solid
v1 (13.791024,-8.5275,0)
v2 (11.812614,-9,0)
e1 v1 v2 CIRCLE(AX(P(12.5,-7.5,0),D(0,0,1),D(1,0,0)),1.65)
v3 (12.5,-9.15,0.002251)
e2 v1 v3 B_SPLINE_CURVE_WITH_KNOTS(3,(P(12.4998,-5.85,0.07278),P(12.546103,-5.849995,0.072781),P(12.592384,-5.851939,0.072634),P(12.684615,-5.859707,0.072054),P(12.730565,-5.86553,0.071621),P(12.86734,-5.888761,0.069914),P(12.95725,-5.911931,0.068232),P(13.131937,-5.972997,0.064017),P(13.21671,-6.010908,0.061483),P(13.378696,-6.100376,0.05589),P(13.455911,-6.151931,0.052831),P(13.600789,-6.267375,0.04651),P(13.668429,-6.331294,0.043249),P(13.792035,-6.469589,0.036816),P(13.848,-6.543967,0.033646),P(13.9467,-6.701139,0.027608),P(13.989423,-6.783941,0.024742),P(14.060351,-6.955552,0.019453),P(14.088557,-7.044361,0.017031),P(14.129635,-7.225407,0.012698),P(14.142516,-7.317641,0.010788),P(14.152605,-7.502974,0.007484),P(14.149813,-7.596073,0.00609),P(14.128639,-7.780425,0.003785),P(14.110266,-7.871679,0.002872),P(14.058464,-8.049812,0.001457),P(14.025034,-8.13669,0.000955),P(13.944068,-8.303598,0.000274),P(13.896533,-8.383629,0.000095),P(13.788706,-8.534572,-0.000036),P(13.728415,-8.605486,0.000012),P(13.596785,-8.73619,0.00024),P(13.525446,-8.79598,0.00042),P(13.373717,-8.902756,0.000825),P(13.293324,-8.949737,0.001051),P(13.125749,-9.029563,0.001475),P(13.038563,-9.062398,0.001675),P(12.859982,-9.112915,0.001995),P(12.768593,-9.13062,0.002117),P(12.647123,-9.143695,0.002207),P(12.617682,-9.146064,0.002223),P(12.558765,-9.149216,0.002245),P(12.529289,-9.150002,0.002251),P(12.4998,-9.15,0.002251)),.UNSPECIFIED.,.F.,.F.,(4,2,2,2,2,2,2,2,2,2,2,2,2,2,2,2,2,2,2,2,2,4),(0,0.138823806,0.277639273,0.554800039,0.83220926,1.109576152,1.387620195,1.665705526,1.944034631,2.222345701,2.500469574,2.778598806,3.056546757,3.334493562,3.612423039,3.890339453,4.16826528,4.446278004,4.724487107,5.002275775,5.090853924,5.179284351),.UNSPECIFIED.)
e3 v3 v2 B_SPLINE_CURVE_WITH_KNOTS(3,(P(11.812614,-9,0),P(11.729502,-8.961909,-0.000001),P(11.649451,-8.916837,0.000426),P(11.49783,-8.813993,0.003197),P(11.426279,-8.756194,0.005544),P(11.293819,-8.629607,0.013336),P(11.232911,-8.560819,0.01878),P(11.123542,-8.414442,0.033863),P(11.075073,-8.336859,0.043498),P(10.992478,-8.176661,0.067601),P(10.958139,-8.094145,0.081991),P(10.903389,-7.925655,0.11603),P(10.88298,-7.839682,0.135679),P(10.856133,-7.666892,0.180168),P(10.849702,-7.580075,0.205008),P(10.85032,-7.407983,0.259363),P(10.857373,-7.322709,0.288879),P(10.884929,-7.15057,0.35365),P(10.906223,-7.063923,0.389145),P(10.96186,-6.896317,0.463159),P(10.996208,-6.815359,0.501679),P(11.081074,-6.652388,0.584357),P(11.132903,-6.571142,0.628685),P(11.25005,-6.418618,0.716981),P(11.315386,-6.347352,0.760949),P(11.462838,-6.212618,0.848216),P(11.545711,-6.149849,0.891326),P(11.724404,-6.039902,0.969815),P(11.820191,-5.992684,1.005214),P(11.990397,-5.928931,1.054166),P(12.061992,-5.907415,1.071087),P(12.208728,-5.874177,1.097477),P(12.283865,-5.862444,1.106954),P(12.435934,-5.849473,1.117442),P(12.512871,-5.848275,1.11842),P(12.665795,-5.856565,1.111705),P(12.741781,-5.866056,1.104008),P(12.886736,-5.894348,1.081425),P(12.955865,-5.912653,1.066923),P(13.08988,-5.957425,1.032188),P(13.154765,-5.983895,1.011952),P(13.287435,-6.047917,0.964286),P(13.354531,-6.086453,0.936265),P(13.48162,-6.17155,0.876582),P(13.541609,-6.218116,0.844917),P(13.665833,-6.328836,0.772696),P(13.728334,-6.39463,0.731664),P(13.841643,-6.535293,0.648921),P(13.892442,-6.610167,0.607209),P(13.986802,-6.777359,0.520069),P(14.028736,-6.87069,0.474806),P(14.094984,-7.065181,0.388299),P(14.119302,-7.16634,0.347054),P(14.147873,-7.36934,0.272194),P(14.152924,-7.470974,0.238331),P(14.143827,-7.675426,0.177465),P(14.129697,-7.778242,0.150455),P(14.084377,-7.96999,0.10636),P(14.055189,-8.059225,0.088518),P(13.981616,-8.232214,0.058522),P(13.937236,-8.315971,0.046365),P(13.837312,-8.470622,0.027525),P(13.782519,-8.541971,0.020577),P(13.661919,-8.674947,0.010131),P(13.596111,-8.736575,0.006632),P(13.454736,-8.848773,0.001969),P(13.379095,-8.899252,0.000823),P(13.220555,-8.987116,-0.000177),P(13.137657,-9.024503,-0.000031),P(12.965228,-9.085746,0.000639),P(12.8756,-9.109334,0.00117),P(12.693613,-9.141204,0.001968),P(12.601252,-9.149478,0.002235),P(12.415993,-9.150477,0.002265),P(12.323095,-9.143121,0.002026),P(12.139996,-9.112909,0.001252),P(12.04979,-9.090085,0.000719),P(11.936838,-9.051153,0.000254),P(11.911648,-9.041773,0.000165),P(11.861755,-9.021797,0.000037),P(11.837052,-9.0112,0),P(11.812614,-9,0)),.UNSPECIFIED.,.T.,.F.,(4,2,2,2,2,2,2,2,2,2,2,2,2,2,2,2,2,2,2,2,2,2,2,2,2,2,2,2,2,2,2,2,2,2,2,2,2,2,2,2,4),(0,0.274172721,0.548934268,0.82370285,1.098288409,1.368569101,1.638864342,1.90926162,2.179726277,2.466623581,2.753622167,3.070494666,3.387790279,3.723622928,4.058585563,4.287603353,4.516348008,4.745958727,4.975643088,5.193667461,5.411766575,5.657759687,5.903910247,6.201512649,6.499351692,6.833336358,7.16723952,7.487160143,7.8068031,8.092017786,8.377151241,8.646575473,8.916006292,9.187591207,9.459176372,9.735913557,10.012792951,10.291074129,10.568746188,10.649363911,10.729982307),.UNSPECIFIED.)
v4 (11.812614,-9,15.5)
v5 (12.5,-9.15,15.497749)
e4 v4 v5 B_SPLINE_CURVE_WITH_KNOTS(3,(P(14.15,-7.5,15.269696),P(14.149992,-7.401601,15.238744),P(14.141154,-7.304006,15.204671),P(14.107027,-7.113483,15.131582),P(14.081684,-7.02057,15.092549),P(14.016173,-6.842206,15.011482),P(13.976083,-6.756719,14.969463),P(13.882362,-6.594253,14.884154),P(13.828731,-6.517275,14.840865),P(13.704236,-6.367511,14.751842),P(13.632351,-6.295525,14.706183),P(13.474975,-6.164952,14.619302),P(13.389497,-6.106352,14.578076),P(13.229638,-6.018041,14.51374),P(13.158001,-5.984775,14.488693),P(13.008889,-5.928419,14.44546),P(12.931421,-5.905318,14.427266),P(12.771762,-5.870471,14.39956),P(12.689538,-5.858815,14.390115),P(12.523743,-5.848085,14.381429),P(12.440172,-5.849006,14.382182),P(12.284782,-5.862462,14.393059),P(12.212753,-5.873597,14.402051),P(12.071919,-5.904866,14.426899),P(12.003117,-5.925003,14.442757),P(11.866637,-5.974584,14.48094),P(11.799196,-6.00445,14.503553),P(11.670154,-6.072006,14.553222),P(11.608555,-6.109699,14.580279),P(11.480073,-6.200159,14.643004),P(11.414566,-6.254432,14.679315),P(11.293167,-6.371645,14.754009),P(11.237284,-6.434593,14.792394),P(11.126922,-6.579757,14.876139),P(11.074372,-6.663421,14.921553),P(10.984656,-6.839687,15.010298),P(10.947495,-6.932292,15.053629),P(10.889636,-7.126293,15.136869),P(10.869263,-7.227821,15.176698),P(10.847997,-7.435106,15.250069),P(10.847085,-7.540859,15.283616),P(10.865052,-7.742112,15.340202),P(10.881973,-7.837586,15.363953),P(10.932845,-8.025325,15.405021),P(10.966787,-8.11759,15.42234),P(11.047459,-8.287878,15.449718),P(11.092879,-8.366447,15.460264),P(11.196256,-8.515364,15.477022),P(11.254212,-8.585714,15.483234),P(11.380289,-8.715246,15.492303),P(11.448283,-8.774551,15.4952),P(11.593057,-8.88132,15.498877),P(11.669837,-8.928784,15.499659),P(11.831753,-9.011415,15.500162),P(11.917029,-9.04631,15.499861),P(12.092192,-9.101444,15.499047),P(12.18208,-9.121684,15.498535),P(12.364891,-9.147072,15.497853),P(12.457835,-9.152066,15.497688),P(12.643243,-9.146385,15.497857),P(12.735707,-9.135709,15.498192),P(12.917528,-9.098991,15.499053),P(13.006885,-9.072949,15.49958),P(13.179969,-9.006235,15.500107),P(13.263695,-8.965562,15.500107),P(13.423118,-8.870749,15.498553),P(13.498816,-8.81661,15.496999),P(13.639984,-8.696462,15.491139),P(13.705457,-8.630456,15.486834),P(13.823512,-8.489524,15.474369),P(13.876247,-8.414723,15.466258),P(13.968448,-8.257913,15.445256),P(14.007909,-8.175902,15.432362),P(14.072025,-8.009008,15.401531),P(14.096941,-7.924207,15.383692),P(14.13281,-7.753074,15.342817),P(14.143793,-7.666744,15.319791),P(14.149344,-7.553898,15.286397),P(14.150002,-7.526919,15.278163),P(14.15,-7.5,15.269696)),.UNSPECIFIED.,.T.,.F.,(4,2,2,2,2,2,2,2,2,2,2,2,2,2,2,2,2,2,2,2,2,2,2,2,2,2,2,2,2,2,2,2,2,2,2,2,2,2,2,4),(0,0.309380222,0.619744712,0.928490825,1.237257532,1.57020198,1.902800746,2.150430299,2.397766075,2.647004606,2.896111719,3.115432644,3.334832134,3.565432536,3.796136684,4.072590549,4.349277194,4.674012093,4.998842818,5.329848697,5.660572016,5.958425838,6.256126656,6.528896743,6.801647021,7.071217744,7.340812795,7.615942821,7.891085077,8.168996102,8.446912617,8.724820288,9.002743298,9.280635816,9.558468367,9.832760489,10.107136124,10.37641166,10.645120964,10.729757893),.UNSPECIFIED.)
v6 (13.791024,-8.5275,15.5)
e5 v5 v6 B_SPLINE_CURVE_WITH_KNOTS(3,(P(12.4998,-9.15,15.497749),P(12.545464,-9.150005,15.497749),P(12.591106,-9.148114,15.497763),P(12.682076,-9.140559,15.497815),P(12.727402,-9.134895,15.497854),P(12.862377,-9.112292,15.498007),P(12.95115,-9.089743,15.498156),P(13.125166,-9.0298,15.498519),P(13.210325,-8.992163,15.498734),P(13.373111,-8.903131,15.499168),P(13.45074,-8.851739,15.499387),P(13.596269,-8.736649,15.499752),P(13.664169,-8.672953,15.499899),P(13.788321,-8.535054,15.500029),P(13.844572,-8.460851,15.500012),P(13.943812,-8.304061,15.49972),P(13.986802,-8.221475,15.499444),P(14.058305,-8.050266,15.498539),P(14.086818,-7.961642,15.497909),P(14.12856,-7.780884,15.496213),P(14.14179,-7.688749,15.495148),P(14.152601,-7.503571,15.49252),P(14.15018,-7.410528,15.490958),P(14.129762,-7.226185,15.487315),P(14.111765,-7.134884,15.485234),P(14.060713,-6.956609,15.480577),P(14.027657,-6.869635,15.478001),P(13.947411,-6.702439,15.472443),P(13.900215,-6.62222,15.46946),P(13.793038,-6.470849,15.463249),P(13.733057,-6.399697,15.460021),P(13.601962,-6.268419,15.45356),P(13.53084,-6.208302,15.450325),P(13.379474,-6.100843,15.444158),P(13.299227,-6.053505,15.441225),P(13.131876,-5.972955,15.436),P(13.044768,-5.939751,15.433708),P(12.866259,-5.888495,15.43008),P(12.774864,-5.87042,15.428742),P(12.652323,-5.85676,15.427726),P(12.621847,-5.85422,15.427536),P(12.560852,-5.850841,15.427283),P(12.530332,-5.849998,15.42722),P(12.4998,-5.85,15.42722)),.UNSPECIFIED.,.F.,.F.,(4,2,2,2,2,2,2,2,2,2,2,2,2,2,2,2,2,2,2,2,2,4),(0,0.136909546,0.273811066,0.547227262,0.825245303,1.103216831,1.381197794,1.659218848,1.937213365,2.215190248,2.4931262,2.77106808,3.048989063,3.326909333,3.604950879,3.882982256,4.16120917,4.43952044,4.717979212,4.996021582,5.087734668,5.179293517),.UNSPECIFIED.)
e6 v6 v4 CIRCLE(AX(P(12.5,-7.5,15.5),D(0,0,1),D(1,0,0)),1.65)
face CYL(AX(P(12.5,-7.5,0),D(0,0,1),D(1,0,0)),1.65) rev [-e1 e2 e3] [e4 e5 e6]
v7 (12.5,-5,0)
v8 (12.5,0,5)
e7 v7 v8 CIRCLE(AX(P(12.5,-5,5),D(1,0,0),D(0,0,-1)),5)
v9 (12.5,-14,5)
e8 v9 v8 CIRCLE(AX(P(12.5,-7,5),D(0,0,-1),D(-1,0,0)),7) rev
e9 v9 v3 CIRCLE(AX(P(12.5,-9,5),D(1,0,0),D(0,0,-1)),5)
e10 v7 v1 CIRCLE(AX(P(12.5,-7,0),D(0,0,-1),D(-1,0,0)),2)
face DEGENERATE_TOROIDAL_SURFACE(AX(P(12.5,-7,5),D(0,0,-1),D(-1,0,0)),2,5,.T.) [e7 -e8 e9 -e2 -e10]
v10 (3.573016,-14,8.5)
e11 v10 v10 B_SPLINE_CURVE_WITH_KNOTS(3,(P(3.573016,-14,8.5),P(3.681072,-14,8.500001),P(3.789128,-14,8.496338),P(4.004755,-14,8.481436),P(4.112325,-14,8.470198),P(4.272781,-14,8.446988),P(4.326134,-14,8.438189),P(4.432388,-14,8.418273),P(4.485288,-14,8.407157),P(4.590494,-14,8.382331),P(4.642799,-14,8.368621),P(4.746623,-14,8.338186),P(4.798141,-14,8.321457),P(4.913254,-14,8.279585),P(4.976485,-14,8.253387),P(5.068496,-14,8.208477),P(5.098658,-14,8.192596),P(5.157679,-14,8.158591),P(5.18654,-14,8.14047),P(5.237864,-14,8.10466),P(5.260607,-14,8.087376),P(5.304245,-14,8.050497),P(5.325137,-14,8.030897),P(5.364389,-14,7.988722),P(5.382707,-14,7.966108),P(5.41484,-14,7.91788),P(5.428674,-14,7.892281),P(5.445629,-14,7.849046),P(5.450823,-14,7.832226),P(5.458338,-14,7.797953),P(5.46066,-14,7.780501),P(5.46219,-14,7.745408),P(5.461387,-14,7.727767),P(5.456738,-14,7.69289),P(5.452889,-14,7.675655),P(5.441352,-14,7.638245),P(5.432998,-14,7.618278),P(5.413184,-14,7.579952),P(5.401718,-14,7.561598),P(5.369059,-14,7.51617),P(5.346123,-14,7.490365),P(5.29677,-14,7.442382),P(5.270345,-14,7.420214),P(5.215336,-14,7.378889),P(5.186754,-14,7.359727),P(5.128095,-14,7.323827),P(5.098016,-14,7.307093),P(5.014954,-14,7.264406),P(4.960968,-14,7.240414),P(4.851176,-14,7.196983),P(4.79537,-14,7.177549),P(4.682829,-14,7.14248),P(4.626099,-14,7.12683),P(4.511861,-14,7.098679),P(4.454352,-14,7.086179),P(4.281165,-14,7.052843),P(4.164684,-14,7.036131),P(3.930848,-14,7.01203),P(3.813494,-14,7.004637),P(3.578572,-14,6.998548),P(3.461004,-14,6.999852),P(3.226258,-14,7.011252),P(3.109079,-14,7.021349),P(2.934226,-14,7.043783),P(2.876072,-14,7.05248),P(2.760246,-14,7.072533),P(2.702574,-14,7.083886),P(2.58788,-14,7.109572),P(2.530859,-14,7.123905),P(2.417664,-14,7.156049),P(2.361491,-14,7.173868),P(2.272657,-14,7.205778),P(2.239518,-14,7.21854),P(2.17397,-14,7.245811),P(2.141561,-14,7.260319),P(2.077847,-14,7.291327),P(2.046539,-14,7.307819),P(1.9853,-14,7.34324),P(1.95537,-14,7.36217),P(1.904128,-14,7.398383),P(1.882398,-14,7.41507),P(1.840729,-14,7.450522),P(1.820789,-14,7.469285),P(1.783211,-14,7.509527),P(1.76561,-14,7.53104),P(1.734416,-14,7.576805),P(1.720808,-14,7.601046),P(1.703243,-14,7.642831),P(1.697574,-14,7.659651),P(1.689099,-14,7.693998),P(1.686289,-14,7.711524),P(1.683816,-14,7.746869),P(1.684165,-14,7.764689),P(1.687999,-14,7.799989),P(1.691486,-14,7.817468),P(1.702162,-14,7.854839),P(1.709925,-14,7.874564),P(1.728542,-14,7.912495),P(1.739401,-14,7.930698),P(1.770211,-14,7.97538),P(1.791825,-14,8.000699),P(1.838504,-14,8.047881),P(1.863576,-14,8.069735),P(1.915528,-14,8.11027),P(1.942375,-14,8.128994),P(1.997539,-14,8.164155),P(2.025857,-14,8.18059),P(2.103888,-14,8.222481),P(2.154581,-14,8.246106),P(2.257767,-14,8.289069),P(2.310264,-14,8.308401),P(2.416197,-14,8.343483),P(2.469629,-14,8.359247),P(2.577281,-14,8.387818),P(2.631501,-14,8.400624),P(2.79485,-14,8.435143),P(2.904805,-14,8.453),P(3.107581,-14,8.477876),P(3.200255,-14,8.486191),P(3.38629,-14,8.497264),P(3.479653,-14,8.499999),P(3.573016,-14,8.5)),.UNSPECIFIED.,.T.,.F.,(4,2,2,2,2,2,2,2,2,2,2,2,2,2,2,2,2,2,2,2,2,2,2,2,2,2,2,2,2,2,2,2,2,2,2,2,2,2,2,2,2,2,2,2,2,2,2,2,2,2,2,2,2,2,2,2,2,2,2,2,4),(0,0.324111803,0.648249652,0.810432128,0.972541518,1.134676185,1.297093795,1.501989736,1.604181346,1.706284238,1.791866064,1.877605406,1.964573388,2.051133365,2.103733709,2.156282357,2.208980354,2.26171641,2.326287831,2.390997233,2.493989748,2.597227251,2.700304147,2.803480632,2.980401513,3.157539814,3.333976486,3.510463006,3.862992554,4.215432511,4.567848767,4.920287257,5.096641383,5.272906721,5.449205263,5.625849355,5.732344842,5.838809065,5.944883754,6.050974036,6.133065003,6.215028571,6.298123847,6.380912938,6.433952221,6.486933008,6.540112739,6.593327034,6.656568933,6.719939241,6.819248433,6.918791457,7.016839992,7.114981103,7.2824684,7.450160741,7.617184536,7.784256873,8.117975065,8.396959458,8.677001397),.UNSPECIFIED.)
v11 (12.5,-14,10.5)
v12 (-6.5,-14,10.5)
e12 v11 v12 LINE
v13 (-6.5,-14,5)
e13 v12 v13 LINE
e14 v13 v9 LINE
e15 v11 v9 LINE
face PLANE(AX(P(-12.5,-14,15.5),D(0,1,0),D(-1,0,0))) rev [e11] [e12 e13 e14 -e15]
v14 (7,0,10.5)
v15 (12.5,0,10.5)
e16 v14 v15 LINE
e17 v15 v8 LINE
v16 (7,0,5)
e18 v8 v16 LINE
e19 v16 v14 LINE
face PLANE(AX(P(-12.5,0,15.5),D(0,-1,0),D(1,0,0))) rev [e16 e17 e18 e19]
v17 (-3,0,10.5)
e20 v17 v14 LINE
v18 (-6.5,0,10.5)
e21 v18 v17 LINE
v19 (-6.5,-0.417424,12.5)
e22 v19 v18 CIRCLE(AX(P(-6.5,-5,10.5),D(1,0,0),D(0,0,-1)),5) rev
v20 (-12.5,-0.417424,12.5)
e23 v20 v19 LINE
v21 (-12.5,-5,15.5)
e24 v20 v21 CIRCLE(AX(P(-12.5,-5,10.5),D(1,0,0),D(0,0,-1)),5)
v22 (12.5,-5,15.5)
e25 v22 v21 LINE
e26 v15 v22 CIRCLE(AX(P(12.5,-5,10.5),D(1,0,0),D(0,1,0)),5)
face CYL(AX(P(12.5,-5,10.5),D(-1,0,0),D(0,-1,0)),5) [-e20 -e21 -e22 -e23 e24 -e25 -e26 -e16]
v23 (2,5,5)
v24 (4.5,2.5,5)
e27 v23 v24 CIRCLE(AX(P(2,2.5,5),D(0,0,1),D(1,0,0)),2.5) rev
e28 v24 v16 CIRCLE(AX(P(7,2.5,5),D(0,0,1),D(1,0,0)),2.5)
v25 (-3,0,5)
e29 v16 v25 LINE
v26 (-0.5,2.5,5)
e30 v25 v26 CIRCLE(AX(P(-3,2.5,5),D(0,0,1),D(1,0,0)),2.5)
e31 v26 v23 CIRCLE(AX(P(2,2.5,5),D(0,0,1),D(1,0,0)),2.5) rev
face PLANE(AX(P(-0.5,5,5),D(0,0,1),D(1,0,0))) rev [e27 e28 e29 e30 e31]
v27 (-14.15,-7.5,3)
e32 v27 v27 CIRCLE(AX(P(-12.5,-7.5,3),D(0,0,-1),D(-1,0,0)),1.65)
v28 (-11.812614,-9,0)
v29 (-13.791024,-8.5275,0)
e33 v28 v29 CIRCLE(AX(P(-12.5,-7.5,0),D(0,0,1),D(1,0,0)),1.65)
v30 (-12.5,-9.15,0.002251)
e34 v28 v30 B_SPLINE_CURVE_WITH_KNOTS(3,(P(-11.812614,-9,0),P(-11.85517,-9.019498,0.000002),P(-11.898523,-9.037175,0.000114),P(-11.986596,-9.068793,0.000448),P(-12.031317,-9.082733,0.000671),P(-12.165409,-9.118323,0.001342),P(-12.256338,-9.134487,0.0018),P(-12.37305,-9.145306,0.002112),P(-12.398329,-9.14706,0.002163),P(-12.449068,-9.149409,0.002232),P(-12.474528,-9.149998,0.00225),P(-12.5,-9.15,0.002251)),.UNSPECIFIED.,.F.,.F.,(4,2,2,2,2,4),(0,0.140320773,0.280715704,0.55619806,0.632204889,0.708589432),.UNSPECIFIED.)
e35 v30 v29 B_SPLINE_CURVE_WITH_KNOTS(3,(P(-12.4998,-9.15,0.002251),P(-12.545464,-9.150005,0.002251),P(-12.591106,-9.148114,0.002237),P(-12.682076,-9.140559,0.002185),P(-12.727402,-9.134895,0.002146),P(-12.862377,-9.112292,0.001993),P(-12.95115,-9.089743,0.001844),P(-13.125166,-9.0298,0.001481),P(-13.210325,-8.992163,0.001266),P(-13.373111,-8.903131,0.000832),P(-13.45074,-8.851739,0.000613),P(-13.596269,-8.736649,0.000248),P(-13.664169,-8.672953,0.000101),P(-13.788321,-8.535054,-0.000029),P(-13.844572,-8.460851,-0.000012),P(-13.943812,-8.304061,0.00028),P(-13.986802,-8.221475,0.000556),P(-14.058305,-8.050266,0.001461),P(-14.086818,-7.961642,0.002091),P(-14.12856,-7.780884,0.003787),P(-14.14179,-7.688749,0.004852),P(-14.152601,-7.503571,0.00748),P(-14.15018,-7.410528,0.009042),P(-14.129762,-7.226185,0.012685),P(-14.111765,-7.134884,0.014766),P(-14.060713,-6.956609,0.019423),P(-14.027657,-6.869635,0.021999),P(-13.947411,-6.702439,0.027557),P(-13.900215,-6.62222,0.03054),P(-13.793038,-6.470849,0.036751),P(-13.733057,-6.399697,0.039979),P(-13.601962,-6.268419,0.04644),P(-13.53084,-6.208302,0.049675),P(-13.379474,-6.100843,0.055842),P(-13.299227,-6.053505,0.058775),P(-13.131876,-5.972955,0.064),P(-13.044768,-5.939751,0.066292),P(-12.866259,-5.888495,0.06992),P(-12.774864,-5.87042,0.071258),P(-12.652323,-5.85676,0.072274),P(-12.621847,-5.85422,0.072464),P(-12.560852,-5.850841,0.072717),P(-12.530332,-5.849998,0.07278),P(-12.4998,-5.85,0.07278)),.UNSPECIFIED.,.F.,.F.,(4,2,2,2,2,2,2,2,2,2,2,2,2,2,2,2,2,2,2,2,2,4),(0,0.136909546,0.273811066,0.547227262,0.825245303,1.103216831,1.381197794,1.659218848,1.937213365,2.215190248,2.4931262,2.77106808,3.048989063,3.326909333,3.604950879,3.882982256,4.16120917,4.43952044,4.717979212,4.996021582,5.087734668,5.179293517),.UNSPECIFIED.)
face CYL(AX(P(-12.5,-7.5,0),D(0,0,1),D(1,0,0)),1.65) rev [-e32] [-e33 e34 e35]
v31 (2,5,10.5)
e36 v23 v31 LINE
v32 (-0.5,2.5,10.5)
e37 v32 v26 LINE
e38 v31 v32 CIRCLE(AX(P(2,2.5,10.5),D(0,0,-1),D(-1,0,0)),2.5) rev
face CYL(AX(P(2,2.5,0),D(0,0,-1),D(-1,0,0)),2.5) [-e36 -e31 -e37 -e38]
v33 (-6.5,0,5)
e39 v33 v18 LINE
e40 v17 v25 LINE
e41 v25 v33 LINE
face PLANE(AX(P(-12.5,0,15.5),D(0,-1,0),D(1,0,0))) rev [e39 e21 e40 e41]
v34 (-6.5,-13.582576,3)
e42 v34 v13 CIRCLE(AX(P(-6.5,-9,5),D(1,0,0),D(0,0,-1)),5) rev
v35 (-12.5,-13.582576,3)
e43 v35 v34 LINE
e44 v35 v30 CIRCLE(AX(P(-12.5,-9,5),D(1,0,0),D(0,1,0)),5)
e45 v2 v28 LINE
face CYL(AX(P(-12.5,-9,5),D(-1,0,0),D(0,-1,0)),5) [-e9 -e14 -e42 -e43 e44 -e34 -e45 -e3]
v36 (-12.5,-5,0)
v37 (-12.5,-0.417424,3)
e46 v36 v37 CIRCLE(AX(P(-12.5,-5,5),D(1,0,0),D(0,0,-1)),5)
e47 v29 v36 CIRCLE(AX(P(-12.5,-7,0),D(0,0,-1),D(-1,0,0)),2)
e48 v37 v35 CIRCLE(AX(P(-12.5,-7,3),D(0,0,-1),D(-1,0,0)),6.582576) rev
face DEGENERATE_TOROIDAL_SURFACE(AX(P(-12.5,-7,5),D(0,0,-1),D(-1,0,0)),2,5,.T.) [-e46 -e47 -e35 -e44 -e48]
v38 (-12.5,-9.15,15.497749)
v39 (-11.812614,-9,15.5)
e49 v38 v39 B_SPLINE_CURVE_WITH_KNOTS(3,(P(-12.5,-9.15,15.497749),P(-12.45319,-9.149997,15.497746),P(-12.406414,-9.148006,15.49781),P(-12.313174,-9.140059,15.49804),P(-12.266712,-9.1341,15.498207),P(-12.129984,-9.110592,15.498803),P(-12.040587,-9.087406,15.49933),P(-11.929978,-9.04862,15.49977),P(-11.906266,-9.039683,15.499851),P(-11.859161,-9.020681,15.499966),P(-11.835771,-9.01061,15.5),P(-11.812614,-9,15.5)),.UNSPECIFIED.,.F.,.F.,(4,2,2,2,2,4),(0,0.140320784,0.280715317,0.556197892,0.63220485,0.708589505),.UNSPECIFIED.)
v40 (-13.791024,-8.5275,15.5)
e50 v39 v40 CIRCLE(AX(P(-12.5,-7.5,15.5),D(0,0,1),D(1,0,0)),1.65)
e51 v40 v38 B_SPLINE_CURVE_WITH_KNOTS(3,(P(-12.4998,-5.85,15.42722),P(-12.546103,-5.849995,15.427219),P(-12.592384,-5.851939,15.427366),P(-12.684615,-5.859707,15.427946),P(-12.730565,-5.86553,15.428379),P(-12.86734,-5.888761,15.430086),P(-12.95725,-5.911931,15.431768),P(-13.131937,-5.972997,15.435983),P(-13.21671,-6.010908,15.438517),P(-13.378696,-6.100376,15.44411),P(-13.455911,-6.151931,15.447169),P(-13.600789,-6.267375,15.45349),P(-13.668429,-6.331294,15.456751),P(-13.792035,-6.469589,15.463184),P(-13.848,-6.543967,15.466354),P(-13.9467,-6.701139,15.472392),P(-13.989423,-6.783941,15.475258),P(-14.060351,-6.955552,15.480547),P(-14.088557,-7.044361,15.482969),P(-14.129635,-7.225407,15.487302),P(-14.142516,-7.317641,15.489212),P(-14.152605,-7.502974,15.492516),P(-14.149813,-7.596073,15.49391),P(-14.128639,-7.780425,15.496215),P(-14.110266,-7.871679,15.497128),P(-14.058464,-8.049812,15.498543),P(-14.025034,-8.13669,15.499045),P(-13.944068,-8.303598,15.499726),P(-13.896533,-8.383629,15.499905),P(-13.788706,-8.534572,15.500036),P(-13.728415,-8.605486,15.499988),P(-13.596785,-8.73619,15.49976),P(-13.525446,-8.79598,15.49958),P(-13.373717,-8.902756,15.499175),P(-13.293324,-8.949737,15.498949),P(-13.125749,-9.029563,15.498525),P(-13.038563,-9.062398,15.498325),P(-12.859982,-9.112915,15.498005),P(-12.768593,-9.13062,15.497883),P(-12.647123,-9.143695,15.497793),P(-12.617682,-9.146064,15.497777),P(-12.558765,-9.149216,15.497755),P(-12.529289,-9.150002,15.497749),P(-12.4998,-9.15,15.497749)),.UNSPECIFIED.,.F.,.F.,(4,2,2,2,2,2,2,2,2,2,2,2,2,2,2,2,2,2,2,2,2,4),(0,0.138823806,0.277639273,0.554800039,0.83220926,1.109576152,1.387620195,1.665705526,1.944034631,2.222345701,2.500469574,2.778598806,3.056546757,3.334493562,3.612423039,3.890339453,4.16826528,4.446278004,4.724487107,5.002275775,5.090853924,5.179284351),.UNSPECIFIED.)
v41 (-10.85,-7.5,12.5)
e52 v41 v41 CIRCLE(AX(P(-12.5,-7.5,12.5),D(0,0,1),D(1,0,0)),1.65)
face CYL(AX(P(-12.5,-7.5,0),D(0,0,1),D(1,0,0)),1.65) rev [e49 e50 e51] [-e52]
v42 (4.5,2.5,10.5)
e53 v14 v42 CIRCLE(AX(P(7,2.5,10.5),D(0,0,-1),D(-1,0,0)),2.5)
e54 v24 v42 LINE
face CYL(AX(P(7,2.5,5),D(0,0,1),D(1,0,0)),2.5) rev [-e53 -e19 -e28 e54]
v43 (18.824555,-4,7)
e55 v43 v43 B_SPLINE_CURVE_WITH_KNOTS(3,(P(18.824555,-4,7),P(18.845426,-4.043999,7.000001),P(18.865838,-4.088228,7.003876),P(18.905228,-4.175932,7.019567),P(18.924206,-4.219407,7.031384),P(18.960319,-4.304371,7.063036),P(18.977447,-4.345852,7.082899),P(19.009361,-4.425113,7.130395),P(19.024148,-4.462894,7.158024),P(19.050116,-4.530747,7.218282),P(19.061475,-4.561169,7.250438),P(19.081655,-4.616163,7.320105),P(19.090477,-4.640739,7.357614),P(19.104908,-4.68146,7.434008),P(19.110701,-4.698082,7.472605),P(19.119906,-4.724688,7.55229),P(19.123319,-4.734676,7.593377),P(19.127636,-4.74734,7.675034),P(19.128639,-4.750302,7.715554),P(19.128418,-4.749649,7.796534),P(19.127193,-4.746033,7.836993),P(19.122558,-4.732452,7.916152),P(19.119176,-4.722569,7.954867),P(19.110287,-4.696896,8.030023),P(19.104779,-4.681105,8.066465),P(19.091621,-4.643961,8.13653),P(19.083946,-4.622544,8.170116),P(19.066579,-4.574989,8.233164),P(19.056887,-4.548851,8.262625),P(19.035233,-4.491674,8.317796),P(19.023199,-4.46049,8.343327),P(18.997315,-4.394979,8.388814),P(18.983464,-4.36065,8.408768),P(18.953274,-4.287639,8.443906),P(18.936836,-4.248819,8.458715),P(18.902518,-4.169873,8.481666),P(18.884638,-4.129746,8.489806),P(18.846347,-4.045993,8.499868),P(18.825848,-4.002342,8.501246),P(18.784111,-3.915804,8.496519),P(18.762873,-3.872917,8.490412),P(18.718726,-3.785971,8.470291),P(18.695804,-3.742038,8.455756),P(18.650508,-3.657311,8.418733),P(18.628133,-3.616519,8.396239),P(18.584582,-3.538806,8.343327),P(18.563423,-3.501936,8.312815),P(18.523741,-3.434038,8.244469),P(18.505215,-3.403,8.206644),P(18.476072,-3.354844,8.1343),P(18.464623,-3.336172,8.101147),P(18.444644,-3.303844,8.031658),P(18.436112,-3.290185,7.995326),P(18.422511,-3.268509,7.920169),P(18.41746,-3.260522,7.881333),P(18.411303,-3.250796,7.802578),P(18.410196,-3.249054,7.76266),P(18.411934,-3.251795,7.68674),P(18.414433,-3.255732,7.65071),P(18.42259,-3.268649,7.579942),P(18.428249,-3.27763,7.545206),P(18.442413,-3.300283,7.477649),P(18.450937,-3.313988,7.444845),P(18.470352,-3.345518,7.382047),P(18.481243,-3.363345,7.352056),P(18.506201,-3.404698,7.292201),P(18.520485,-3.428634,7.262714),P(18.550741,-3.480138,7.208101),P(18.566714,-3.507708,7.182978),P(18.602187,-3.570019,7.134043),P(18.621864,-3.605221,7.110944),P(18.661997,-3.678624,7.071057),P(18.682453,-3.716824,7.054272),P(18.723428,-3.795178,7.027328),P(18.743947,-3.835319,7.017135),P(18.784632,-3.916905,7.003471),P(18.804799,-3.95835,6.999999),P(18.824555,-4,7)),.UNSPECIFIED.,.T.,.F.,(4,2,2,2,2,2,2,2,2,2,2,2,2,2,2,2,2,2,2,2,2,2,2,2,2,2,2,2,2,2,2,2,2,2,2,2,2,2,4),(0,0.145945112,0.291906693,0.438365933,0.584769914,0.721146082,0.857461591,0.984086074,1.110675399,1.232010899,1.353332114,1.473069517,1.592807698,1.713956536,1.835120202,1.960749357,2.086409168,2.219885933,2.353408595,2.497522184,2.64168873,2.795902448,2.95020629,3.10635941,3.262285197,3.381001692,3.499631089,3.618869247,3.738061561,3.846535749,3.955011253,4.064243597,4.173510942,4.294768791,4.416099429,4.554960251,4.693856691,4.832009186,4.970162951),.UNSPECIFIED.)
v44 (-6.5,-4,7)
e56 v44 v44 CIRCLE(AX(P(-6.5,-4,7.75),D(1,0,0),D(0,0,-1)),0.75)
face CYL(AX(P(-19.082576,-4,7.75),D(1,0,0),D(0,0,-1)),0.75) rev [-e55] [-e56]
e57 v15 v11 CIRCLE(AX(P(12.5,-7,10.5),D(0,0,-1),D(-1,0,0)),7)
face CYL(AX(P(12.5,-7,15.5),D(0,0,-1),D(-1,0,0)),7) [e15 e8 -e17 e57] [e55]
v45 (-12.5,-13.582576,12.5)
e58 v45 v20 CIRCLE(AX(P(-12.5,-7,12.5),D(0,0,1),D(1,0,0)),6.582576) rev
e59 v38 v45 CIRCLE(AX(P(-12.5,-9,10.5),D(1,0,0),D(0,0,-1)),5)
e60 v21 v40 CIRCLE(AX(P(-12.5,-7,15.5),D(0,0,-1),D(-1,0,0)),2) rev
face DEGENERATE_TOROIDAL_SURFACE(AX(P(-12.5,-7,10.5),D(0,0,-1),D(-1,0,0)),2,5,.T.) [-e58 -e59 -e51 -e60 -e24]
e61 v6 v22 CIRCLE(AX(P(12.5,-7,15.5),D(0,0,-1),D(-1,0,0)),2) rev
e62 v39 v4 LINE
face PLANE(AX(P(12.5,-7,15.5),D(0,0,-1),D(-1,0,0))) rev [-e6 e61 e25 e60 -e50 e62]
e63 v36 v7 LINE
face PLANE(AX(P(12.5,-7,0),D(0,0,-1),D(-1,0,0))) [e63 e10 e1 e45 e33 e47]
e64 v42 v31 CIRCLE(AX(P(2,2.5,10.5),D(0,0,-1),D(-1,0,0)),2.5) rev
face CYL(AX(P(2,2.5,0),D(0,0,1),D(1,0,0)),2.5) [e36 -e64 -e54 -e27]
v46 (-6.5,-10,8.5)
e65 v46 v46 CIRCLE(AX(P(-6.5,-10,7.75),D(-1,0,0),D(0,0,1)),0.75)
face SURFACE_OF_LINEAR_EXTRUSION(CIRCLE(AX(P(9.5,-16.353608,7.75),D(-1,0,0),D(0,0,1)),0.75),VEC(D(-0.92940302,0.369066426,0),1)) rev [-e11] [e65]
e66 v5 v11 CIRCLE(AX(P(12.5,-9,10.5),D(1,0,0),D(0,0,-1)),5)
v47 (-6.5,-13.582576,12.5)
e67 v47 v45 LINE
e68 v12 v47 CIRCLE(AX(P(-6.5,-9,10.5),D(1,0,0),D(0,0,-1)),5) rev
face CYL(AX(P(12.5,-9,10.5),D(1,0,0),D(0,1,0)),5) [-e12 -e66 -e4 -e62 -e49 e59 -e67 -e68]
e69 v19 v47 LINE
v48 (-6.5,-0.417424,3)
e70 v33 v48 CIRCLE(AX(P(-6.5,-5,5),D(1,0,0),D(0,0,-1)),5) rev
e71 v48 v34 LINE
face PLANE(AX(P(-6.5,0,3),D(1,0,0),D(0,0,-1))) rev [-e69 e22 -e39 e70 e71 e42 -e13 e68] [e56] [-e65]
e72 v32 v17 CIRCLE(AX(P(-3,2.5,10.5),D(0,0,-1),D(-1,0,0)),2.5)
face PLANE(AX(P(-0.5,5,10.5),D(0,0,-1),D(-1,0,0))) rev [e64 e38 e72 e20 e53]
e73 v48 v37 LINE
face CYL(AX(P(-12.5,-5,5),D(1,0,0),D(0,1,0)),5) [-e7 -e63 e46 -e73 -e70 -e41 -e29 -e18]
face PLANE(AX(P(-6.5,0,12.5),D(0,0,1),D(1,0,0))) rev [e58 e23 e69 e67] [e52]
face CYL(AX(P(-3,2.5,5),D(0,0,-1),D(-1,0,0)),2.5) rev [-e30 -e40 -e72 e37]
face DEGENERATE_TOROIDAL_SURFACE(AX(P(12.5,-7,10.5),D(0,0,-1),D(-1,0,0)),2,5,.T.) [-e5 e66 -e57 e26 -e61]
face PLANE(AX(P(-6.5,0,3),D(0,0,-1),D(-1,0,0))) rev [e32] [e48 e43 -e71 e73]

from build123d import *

# Parameters (mm, degrees)
BOSS_EXTRUDE1_DEPTH = 15.5
FILLET1_R           = 5
SKETCH5_W           = 13
SKETCH5_H           = 9.5
CUT_EXTRUDE3_DEPTH  = 36.29164207
SKETCH6_W           = 5
SKETCH6_H           = 5.5
BOSS_EXTRUDE2_DEPTH = 5
FILLET2_R           = 2.5
FILLET3_R           = 2.5
SKETCH3_R           = 1.65
CUT_EXTRUDE4_DEPTH  = 29.574464179
SKETCH8_R           = 0.75
CUT_EXTRUDE7_DEPTH  = 44.873285276
SKETCH9_R           = 0.75
CUT_EXTRUDE9_DEPTH  = 17.215351852


with BuildPart() as part:
    # Sketch2 → Boss-Extrude1 (new body)
    with BuildSketch(Plane.XY):
        with BuildLine():
            Line((-12.5, 0), (12.5, 0))
            ThreePointArc((12.5, 0), (19.5, -7), (12.5, -14))
            Line((12.5, -14), (-12.5, -14))
            ThreePointArc((-12.5, -14), (-19.5, -7), (-12.5, 0))
        make_face()
    extrude(amount=BOSS_EXTRUDE1_DEPTH)

    # Fillet1
    fillet1_edges = [part.edges().sort_by_distance(p)[0] for p in [
        (-19.5, -7, 15.5),
        (0, -14, 15.5),
        (19.5, -7, 15.5),
        (0, -14, 0),
        (-19.5, -7, 0),
        (0, 0, 0),
        (19.5, -7, 0),
        (0, 0, 15.5),
    ]]
    fillet(fillet1_edges, radius=FILLET1_R)

    # Sketch5 → Cut-Extrude3 (cut, through all)
    with BuildSketch(Plane(origin=(0, -25, 0), x_dir=(-1, 0, 0), z_dir=(0, -1, 0))):
        with Locations((13, -7.75)):
            Rectangle(SKETCH5_W, SKETCH5_H)
    extrude(amount=-CUT_EXTRUDE3_DEPTH, mode=Mode.SUBTRACT)

    # Sketch6 → Boss-Extrude2 (add)
    with BuildSketch(Plane(origin=(0, 0, 0), x_dir=(1, 0, 0), z_dir=(0, 1, 0))):
        with Locations((2, -7.75)):
            Rectangle(SKETCH6_W, SKETCH6_H)
    extrude(amount=BOSS_EXTRUDE2_DEPTH)

    # Fillet2
    fillet2_edges = [part.edges().sort_by_distance(p)[0] for p in [
        (4.5, 5, 7.75),
        (-0.5, 5, 7.75),
    ]]
    fillet(fillet2_edges, radius=FILLET2_R - 0.0001)  # a hair under: the kernel refuses the full size

    # Fillet3
    fillet3_edges = [part.edges().sort_by_distance(p)[0] for p in [
        (-0.5, 0, 7.75),
        (4.5, 0, 7.75),
    ]]
    fillet(fillet3_edges, radius=FILLET3_R)

    # Sketch3 → Cut-Extrude4 (cut, through all)
    with BuildSketch(Plane.XY.offset(15.5)):
        with Locations((-12.5, -7.5)):
            Circle(SKETCH3_R)
        with Locations(Location((12.5, -7.5, 0), (0, 0, 321.484430951))):
            Circle(SKETCH3_R)
    extrude(amount=-CUT_EXTRUDE4_DEPTH, mode=Mode.SUBTRACT)

    # Sketch8 → Cut-Extrude7 (cut, through all)
    with BuildSketch(Plane(origin=(19.5, 0, 0), x_dir=(0, 0, -1), z_dir=(1, 0, 0))):
        with Locations((-7.75, -4)):
            Circle(SKETCH8_R)
    extrude(amount=-CUT_EXTRUDE7_DEPTH, mode=Mode.SUBTRACT)

    # Sketch9 → Cut-Extrude9 (cut, along a direction that is not the sketch's normal)
    with BuildSketch(Plane.ZY.offset(6.5)):
        with Locations((7.75, -10)):
            Circle(SKETCH9_R)
    extrude(amount=-CUT_EXTRUDE9_DEPTH, dir=(-0.9294030199155335, 0.36906642569039866, 0), mode=Mode.SUBTRACT)


solid = part.part
